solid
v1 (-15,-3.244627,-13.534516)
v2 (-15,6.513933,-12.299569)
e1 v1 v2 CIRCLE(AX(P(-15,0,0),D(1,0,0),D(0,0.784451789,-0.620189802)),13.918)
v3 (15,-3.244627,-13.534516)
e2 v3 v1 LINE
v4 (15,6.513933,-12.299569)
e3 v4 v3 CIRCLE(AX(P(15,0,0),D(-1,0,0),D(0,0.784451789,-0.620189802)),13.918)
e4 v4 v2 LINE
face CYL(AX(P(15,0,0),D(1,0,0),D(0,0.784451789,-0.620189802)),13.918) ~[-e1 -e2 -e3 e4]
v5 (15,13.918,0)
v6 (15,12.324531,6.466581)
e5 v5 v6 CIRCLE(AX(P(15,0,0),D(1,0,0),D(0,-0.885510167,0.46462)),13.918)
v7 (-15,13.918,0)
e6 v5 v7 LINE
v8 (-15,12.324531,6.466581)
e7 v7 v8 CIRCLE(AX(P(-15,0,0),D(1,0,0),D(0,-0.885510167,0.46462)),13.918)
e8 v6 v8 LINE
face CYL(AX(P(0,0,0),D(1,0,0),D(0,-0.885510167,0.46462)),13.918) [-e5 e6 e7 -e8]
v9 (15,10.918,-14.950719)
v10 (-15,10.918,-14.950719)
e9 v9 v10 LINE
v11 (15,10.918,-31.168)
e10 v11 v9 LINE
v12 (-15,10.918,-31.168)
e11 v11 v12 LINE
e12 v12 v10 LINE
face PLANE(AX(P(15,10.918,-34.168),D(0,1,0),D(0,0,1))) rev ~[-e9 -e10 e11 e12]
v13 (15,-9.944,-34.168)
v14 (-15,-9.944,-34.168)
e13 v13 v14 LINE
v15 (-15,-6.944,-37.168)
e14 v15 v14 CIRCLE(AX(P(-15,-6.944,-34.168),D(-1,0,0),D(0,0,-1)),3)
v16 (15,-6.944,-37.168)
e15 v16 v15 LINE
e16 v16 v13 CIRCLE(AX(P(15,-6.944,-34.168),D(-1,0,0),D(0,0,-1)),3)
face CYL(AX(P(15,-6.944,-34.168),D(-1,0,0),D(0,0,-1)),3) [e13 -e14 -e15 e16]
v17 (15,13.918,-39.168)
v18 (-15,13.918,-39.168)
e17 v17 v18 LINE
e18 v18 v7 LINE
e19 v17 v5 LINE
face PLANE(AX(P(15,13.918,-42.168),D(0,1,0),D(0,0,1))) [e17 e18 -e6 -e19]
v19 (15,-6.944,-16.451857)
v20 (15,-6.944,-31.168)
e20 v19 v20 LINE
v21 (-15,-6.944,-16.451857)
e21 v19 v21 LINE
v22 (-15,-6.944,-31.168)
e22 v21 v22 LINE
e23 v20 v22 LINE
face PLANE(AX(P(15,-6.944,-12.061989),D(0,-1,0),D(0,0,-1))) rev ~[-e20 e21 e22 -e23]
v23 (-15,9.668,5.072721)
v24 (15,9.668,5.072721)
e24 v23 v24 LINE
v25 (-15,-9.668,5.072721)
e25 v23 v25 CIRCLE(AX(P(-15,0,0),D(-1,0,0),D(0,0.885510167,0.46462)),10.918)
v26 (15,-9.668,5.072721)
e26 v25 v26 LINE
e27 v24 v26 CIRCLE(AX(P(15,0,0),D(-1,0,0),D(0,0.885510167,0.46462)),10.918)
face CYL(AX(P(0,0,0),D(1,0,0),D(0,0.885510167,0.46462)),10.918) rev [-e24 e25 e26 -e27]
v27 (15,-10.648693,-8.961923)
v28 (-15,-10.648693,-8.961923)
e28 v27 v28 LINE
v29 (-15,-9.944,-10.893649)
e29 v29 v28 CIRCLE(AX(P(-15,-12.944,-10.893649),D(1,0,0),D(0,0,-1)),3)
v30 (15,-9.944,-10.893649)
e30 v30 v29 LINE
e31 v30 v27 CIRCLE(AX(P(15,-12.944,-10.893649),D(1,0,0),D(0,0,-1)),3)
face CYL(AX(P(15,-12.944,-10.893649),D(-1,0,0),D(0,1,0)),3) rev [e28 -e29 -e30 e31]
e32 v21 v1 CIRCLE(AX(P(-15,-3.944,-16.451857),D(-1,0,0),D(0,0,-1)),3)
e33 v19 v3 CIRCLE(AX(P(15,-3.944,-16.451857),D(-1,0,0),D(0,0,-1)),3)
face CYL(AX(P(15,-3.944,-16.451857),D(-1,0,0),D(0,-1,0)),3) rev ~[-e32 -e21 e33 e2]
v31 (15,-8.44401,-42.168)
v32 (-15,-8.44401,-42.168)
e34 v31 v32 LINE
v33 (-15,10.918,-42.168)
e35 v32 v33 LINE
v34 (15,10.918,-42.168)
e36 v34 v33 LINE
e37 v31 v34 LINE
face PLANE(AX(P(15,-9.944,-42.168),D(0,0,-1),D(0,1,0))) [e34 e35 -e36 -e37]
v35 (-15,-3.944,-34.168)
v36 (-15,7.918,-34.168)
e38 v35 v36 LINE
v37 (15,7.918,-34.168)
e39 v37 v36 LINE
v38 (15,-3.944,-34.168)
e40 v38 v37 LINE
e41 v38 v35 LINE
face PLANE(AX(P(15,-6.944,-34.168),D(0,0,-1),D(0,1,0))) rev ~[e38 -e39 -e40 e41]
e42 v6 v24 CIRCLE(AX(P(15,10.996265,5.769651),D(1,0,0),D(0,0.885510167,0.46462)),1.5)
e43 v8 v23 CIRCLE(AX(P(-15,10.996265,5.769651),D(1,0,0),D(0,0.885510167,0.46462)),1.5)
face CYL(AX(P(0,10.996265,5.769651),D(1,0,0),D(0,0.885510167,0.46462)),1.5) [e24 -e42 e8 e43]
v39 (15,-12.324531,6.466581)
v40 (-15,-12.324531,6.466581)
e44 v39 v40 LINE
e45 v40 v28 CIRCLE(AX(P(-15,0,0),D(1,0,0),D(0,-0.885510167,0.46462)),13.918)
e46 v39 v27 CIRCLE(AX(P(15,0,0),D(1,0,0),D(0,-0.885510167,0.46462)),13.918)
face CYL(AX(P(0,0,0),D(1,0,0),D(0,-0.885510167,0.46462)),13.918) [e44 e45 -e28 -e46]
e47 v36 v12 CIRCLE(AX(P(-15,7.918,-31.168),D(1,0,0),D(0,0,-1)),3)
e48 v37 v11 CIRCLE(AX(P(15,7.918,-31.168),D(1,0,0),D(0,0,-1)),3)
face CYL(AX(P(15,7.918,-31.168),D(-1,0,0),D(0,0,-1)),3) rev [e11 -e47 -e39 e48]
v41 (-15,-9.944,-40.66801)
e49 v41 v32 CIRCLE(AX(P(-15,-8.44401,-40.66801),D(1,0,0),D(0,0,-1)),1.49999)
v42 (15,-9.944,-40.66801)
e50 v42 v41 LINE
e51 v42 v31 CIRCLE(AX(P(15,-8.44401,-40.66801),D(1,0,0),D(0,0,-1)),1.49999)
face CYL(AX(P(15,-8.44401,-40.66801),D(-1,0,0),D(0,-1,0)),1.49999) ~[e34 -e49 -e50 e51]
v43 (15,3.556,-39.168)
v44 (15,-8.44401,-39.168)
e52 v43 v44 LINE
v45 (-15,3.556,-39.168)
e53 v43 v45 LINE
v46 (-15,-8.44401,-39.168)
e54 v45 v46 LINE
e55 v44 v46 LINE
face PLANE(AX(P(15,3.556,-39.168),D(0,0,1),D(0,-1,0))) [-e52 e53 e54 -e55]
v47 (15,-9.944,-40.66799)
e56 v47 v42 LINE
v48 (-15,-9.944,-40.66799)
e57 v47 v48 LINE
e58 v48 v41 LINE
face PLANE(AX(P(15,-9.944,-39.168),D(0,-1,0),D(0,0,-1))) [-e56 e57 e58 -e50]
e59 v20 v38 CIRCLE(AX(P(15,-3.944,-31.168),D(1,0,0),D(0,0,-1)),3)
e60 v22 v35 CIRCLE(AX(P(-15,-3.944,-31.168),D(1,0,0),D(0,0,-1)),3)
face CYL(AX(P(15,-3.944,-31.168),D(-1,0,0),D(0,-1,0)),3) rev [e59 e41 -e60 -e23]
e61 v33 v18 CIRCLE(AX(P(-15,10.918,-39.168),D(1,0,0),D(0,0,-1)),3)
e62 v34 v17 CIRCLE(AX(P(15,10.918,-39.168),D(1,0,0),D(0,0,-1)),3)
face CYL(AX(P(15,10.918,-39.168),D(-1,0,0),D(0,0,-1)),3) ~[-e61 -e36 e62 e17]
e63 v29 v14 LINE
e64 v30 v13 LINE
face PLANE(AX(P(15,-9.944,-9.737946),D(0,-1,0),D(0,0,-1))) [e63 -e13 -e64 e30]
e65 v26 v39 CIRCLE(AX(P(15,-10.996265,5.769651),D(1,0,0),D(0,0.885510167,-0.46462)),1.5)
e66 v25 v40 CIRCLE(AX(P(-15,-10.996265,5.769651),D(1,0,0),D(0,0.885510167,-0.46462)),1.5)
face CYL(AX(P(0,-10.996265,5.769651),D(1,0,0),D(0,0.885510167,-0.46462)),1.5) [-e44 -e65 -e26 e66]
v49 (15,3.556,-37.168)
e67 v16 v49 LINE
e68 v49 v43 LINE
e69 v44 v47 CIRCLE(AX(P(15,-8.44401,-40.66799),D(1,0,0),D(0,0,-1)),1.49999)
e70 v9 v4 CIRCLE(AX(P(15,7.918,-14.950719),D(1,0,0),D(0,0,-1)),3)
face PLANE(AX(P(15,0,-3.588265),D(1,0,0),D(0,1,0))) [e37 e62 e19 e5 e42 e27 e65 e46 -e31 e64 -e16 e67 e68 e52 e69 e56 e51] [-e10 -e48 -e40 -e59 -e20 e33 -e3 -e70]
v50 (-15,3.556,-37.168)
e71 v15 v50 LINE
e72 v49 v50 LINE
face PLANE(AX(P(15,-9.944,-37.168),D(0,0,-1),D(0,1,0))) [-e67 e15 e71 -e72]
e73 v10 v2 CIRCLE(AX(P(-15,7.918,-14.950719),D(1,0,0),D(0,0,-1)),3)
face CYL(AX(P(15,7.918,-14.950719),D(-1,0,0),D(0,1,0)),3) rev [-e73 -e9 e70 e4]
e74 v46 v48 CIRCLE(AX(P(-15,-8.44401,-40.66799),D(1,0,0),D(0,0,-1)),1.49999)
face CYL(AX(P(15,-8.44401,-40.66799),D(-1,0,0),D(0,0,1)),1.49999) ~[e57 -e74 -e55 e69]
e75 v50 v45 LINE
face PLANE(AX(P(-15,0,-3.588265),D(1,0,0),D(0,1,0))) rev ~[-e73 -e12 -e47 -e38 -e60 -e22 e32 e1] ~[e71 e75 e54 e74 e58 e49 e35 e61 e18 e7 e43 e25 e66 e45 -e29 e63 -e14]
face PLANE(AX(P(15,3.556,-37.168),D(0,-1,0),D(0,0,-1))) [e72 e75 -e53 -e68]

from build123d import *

# Parameters (mm, degrees)
F1_DEPTH = 15
F3_DEPTH = 30
F4_R     = 1.49999
F6_DEPTH = 30.001
F7_R     = 3


# Not quite as in the source:
# - a fillet or chamfer is up to 0.001 mm smaller than in the source, because OpenCascade refuses the exact size


with BuildPart() as f1:
    # F0 (on Right) → F1 (new body, symmetric)
    with BuildSketch(Plane.YZ):
        with BuildLine():
            ThreePointArc((12.3245305001, 6.4665811641), (10.2993352496, 7.0979164137), (9.668, 5.0727211632))
            ThreePointArc((9.668, 5.0727211632), (0, -10.918), (-9.668, 5.0727211632))
            ThreePointArc((-9.668, 5.0727211632), (-10.2993352496, 7.0979164137), (-12.3245305001, 6.4665811641))
            ThreePointArc((-12.3245305001, 6.4665811641), (0, -13.918), (12.3245305001, 6.4665811641))
        make_face()
    extrude(amount=F1_DEPTH, both=True)

    # F2 (on face) → F3 (join, through all)
    with BuildSketch(Plane.YZ.offset(15)):
        with BuildLine():
            ThreePointArc((13.918, 0), (5.2588084202, -12.886258495), (-9.944, -9.7379457793))
            Line((-9.944, -9.7379457793), (-9.944, -37.168))
            Line((-9.944, -37.168), (3.556, -37.168))
            Line((3.556, -37.168), (3.556, -39.168))
            Line((3.556, -39.168), (-9.944, -39.168))
            Line((-9.944, -39.168), (-9.944, -42.168))
            Line((-9.944, -42.168), (13.918, -42.168))
            Line((13.918, -42.168), (13.918, 0))
        make_face()
    extrude(amount=-F3_DEPTH)

    # F4 (radius 1.5 in the source; OpenCascade refuses exactly that, so slightly less here)
    f4_edges = [f1.edges().sort_by_distance(p)[0] for p in [
        (0, -9.944, -39.168),
        (0, -9.944, -42.168),
    ]]
    fillet(f4_edges, radius=F4_R)

    # F5 (on face) → F6 (cut, through all)
    with BuildSketch(Plane.YZ.offset(15)):
        with BuildLine():
            ThreePointArc((10.918, -8.6318016659), (2.6248268424, -13.6682481704), (-6.944, -12.0619893882))
            Line((-6.944, -12.0619893882), (-6.944, -34.168))
            Line((-6.944, -34.168), (10.918, -34.168))
            Line((10.918, -34.168), (10.918, -8.6318016659))
        make_face()
    extrude(amount=-F6_DEPTH, mode=Mode.SUBTRACT)

    # F7
    f7_edges = [f1.edges().sort_by_distance(p)[0] for p in [
        (0, -9.944, -9.737946),
        (0, -9.944, -37.168),
        (0, 13.918, -42.168),
        (0, -6.944, -12.061989),
        (0, 10.918, -8.631802),
        (0, 10.918, -34.168),
        (0, -6.944, -34.168),
    ]]
    fillet(f7_edges, radius=F7_R)


solid = f1.part
